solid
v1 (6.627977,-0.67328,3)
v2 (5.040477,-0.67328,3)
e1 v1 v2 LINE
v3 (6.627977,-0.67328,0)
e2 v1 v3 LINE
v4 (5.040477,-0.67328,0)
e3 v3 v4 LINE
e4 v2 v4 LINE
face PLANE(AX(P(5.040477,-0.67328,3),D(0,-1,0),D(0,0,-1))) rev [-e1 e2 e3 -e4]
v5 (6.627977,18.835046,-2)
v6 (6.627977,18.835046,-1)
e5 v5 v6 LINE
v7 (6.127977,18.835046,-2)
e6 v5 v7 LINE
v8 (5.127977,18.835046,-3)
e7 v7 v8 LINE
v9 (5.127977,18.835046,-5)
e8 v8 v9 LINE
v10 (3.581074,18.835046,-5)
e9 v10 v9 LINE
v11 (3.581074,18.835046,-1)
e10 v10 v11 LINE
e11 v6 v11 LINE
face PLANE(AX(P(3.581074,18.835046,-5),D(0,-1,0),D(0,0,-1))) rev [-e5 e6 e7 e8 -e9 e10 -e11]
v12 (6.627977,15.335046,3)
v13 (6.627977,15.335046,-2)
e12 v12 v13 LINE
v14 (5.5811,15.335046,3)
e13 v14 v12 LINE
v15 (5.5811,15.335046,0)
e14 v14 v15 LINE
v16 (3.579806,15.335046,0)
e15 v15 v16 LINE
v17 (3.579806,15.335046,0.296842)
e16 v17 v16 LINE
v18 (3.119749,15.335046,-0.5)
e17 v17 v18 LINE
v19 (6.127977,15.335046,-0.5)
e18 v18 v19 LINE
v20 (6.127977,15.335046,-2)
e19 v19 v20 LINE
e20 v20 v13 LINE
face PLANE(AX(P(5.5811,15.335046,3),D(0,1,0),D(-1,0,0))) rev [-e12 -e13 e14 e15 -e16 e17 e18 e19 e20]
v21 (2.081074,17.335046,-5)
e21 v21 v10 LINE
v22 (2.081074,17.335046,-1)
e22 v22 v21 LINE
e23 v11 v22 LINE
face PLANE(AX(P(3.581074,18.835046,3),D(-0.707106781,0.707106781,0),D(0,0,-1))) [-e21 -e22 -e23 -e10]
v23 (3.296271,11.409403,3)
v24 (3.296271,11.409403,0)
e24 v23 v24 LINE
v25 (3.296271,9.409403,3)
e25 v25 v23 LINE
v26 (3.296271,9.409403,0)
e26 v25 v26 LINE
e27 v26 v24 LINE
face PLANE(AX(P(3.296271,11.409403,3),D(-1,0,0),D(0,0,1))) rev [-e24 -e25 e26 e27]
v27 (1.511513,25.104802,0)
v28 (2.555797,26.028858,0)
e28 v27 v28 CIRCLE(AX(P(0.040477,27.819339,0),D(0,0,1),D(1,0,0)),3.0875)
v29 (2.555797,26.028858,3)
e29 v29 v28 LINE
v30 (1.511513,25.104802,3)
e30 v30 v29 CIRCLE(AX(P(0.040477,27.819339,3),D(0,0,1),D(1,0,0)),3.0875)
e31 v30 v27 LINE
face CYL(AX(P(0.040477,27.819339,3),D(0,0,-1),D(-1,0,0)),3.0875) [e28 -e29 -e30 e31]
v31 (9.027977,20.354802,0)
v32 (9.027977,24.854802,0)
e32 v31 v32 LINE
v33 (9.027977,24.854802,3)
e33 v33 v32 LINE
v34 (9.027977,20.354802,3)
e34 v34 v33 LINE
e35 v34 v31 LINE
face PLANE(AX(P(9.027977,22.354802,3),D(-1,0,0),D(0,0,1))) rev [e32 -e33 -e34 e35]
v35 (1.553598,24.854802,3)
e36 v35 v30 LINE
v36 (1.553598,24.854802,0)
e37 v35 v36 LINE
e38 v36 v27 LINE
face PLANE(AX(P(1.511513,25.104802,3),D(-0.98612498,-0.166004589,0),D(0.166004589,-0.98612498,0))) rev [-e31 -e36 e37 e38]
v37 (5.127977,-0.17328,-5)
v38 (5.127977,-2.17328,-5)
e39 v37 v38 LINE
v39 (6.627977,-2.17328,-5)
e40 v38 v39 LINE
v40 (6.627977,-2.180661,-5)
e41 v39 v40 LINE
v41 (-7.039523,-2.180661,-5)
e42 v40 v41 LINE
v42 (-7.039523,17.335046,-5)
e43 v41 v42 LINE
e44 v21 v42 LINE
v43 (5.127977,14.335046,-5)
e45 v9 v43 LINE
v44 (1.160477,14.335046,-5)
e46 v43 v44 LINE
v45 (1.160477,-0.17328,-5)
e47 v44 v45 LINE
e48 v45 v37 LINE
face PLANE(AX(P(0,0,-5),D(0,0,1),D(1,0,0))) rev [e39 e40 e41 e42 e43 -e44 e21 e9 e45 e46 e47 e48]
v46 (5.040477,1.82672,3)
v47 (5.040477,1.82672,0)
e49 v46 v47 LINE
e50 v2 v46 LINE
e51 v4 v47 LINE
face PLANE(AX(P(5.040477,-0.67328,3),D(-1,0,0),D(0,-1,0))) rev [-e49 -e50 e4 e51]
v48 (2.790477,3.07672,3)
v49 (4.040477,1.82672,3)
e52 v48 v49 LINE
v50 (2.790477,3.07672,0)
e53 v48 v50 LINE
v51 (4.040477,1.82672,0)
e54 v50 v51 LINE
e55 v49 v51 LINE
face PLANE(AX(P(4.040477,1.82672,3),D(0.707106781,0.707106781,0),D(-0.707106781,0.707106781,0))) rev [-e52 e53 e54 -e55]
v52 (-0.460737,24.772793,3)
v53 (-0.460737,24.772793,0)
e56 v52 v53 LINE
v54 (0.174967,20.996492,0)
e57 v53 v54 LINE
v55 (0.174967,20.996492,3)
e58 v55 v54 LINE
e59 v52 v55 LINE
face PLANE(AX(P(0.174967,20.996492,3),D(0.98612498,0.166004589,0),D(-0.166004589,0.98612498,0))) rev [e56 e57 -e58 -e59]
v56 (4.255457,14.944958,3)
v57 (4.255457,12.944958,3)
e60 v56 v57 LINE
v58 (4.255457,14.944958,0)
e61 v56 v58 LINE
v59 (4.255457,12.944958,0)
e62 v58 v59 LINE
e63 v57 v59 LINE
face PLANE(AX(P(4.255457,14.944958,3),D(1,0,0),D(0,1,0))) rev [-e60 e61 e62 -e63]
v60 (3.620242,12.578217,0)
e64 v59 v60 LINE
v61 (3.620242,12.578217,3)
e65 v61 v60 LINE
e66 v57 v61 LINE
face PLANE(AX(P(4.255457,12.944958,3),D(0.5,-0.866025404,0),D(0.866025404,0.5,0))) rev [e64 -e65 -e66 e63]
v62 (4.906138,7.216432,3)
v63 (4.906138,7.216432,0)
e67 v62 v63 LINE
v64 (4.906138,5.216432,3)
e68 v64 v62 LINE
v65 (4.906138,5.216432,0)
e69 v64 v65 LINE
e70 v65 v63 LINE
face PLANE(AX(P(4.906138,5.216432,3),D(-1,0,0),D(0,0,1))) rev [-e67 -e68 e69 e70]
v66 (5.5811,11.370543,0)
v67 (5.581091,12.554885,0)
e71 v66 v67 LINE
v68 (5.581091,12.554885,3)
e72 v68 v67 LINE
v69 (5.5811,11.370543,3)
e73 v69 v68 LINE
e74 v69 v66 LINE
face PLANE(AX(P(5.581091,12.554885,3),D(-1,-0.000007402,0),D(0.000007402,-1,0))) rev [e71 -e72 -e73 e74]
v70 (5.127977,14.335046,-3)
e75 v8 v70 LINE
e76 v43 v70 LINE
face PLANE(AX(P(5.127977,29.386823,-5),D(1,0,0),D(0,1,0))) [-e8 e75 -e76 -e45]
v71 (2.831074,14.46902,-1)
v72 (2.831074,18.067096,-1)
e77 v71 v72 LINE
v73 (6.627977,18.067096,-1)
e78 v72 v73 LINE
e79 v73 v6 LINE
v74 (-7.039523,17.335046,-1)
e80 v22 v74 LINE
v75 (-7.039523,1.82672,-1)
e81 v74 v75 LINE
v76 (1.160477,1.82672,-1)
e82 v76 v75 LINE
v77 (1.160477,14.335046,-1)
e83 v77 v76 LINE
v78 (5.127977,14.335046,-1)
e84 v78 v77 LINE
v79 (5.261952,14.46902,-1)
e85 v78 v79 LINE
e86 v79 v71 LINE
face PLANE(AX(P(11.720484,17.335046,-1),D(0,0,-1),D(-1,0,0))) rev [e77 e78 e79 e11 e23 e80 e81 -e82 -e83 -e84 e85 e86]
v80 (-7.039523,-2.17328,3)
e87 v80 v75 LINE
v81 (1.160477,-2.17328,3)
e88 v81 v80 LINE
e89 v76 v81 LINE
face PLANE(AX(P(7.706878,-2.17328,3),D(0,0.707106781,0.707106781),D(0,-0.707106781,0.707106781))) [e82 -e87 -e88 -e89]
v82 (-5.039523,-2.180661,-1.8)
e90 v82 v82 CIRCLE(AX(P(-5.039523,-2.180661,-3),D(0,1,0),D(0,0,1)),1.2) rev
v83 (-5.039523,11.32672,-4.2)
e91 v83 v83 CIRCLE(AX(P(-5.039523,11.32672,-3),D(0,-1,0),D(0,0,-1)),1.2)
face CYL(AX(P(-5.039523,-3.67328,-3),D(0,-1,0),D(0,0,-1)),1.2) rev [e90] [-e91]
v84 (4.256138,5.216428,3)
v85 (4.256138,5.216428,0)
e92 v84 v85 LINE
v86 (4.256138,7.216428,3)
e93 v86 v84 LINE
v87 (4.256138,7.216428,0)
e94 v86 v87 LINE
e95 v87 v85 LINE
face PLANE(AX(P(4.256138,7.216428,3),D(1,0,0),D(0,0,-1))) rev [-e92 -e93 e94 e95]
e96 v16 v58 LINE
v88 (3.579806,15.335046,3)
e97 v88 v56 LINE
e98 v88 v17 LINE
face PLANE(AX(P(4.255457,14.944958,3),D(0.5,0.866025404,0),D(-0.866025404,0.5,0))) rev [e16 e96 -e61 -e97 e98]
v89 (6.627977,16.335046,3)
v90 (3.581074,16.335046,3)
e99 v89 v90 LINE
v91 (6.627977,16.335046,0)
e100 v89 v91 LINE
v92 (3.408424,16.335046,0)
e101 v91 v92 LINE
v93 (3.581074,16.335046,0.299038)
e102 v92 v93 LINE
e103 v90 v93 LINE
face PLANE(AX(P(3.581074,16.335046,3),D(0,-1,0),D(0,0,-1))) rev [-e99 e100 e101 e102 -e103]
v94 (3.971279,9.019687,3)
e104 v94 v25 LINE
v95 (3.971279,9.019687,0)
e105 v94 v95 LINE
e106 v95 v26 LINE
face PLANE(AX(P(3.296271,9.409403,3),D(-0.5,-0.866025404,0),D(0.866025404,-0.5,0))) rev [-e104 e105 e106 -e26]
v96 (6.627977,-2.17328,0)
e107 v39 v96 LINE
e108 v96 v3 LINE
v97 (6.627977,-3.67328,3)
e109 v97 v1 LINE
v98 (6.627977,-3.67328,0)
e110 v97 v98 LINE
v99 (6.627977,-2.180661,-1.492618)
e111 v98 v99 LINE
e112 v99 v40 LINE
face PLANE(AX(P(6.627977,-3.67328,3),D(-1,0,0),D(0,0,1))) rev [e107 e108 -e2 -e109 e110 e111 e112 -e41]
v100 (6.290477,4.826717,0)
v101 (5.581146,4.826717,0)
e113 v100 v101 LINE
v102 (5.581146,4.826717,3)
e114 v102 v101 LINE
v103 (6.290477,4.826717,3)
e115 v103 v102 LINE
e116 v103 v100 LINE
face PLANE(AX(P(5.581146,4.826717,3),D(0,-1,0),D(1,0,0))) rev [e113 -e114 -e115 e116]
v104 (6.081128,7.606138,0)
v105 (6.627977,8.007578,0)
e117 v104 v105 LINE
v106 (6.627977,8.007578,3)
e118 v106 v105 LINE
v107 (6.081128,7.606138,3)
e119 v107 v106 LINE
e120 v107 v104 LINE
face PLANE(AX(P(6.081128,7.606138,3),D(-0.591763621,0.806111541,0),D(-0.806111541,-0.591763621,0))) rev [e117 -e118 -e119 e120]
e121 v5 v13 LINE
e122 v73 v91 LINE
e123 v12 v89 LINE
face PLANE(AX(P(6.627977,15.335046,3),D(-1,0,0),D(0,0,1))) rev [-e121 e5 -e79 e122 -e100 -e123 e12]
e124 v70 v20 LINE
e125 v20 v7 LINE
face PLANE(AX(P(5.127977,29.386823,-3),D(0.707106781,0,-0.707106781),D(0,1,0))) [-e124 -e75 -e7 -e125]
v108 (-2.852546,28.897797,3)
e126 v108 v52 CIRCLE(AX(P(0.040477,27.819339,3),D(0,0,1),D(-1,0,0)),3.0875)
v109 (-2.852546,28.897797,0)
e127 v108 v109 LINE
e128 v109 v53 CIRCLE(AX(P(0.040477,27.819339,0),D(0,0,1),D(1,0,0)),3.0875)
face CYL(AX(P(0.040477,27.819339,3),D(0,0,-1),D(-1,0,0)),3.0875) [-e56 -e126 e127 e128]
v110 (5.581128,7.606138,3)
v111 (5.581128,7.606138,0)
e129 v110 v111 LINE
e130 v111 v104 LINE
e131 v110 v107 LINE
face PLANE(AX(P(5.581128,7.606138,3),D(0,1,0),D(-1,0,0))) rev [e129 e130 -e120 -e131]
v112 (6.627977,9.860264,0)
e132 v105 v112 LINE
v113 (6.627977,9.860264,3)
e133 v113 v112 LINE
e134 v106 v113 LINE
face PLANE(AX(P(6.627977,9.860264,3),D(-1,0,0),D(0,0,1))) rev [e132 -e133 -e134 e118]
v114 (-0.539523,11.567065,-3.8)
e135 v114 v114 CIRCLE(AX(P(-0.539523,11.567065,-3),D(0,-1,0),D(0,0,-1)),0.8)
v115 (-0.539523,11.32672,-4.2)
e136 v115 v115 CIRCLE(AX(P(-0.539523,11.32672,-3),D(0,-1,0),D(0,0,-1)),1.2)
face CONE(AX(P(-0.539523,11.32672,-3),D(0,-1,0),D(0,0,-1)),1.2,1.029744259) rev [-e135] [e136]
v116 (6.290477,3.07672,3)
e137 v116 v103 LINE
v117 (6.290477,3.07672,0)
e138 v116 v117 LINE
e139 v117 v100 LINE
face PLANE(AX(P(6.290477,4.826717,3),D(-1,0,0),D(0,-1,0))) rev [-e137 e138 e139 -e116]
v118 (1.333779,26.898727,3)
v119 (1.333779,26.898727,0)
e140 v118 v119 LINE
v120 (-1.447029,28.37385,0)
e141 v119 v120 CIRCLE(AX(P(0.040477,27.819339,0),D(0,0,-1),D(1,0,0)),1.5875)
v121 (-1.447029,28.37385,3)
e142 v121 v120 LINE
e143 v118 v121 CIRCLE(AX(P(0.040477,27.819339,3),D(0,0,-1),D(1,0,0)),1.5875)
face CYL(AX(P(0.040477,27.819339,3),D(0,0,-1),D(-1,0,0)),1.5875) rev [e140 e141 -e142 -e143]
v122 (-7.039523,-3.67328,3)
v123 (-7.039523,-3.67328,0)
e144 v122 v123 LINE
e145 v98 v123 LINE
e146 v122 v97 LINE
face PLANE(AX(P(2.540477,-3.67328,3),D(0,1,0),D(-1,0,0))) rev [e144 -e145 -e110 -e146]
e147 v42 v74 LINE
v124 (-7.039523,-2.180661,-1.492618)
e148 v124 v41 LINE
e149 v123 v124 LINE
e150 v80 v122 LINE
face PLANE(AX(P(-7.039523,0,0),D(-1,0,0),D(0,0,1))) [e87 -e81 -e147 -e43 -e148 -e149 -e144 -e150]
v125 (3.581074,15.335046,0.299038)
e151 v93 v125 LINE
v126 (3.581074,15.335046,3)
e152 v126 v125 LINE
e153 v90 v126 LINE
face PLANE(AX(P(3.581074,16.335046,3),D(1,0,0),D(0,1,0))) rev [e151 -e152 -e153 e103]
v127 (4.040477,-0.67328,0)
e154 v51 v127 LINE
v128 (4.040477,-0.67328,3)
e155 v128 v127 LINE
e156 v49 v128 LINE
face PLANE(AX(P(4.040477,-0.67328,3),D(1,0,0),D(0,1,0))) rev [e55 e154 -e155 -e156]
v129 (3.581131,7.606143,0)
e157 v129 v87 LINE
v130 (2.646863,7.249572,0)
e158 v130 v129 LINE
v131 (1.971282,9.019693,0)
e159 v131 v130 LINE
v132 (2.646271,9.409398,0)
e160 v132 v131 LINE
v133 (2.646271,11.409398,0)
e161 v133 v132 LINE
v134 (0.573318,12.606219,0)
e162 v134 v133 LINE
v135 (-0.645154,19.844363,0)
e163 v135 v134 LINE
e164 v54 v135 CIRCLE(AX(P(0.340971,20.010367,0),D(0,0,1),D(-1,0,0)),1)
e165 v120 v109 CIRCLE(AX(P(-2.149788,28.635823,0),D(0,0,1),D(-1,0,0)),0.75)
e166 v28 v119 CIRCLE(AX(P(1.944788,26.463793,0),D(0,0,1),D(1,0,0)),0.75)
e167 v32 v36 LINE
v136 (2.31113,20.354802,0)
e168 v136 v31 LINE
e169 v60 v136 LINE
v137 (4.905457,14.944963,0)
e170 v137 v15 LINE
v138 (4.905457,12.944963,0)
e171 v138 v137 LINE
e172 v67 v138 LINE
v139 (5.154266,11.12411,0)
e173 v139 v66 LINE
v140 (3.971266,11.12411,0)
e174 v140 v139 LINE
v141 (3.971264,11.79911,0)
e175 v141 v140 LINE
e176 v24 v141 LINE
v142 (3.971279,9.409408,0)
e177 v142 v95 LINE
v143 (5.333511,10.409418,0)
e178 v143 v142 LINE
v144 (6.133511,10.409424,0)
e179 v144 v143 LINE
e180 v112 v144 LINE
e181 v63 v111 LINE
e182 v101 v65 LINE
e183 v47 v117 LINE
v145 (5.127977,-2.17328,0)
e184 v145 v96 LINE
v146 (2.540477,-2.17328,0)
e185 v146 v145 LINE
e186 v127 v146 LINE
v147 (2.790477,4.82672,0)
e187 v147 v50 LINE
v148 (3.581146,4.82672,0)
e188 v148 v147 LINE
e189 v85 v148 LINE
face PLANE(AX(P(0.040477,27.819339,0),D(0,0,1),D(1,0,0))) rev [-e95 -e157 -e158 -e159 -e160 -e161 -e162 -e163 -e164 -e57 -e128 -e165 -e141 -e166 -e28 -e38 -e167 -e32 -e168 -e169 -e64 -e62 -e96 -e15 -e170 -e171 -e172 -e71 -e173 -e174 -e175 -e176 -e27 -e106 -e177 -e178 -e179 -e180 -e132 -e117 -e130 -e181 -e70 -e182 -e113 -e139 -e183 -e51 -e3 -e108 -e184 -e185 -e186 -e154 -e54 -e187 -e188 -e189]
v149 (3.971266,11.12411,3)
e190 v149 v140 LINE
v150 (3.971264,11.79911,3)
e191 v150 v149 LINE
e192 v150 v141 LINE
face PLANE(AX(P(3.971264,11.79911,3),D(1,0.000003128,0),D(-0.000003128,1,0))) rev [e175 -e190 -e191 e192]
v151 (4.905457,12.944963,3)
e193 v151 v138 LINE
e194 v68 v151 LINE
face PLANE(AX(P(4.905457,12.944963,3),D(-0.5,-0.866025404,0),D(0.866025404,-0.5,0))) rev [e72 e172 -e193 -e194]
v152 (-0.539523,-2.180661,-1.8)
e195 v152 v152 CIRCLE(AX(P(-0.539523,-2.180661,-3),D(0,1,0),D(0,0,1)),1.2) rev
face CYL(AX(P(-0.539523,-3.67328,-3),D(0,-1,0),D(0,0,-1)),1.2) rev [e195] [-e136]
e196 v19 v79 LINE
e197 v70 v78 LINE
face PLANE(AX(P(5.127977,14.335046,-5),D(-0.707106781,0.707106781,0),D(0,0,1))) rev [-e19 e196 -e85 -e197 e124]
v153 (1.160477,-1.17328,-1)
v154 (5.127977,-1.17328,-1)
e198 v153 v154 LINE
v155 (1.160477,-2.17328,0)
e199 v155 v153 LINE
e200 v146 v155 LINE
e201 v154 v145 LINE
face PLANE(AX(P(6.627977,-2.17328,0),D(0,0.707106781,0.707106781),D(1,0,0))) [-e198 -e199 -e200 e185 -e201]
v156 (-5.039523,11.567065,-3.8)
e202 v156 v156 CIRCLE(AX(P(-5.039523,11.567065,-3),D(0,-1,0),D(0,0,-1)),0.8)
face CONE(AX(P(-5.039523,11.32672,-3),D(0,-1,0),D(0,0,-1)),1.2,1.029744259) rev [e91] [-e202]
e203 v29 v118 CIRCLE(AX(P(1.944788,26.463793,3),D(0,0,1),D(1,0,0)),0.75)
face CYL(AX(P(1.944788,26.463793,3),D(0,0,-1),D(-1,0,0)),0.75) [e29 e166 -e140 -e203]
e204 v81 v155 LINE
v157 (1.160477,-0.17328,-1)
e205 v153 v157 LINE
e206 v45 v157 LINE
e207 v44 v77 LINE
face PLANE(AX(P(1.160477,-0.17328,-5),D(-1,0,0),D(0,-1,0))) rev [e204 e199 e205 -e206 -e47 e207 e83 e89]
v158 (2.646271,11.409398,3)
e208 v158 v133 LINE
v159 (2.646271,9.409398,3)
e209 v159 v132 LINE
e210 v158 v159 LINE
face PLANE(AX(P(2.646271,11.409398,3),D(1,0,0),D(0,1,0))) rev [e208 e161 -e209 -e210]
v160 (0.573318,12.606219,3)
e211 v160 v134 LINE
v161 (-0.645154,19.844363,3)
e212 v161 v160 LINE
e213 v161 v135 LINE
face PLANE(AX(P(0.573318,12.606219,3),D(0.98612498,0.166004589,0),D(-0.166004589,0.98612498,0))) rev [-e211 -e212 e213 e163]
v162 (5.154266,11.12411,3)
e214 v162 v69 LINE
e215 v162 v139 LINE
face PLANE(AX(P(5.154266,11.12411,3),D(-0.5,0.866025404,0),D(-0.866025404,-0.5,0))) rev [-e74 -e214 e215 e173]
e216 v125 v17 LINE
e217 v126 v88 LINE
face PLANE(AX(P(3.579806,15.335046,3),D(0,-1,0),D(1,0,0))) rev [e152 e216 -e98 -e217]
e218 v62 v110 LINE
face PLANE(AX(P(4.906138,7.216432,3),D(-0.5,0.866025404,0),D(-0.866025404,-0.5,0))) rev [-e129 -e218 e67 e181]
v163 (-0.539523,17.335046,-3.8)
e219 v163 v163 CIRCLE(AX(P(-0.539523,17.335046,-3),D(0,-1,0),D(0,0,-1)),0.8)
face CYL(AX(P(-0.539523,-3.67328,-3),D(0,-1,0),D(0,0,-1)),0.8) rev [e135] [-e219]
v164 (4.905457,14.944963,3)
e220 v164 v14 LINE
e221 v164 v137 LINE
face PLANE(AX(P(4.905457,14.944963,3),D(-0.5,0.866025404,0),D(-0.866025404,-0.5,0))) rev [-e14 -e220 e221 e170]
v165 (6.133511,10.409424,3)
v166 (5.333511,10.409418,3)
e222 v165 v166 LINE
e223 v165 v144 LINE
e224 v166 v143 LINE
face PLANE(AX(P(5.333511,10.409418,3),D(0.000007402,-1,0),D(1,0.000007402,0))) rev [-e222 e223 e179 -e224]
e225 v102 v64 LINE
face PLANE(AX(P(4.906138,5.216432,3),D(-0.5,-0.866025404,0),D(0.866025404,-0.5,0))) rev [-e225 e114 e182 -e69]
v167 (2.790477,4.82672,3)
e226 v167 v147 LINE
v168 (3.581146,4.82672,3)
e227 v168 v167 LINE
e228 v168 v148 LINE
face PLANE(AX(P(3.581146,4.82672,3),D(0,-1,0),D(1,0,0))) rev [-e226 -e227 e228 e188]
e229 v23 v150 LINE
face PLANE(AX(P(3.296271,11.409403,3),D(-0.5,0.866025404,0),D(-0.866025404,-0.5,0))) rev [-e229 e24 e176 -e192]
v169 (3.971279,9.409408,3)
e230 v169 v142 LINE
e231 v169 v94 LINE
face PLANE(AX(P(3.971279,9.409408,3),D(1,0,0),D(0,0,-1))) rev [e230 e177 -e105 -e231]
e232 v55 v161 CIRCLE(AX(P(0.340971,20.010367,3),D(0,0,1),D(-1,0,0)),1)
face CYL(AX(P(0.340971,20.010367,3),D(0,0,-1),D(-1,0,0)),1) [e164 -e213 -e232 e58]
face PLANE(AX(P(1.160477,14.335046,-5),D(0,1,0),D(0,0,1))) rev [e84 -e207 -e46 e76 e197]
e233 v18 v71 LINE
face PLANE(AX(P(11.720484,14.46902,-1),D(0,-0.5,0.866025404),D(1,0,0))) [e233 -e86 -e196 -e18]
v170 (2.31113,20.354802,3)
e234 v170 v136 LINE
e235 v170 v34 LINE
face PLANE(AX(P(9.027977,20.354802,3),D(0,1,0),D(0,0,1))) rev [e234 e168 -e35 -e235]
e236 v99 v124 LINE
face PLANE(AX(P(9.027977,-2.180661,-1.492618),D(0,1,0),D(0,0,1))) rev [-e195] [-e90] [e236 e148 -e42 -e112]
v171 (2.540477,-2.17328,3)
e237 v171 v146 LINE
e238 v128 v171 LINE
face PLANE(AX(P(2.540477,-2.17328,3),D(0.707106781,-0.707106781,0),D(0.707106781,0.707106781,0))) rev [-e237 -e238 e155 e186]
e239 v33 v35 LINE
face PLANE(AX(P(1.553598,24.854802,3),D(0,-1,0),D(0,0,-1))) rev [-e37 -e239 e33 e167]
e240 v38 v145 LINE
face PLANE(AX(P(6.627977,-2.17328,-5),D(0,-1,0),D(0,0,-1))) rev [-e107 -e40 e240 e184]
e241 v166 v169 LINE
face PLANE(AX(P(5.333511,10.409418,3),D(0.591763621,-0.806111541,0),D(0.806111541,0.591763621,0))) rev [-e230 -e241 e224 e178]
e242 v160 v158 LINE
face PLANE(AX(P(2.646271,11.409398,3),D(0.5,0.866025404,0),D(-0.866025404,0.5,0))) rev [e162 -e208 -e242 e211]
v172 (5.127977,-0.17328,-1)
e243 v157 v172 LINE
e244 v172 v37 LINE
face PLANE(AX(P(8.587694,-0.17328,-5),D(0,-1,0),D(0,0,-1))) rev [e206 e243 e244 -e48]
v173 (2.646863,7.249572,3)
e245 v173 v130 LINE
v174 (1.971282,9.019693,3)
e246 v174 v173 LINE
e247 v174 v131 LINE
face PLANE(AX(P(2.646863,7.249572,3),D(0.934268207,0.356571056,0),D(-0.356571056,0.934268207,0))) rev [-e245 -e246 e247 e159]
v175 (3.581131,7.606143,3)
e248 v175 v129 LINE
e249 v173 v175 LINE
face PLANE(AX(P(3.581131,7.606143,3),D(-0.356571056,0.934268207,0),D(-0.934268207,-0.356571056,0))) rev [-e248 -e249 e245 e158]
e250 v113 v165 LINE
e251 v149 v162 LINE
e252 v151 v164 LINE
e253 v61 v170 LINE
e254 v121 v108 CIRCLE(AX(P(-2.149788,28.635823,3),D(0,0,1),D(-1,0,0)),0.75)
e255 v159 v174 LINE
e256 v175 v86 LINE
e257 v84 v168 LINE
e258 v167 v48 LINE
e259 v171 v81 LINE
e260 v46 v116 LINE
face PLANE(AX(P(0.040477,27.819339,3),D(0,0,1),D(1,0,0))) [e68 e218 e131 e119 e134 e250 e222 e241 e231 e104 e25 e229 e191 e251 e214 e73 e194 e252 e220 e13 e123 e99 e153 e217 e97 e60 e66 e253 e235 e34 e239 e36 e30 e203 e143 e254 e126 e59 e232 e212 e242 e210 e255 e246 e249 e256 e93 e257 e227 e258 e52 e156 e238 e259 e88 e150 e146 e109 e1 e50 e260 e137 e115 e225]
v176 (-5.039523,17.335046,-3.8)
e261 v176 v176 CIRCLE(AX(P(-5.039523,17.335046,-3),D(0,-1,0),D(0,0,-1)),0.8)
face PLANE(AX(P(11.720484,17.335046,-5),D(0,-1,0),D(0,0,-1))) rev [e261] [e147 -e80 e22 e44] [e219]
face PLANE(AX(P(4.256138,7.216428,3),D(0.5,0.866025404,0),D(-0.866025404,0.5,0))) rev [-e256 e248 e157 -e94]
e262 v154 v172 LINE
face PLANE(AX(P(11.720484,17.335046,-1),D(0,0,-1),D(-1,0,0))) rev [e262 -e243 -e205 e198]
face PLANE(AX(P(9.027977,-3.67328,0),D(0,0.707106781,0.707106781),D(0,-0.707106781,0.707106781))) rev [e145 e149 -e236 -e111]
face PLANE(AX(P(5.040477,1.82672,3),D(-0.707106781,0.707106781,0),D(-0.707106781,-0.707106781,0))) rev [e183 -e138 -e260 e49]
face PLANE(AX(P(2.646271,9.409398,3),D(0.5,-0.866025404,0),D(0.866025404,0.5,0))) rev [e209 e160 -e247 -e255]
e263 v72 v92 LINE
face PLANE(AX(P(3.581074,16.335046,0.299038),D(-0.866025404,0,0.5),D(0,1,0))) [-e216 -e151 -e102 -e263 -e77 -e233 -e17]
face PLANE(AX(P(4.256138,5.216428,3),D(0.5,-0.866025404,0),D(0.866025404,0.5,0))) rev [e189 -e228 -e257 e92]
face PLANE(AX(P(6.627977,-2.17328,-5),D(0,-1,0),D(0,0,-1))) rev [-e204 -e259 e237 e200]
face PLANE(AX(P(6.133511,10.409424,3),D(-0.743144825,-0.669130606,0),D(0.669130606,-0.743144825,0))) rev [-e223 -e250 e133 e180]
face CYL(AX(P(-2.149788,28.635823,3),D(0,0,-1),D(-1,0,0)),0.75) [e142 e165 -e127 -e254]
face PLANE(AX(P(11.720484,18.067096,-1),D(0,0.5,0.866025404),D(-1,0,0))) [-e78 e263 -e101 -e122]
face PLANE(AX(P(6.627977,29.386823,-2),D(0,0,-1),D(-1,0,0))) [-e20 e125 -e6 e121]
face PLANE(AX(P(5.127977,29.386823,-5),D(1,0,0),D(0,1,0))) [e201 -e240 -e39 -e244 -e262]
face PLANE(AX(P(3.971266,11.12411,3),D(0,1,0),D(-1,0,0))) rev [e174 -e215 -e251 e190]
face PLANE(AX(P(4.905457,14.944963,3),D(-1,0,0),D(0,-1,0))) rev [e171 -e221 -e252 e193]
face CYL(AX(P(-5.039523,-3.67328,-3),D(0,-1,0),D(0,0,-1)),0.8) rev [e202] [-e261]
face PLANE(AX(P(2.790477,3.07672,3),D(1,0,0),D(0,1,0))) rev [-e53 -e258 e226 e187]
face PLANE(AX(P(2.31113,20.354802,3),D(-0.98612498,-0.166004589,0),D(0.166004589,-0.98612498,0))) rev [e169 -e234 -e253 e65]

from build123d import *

# Parameters (mm, degrees)
BOSS_SWITCH_BODY_DEPTH                    = 3
SKETCH1_W                                 = 4.0875
SKETCH1_H                                 = 1.5
SKETCH1_W_2                               = 3.046903414
SKETCH1_H_2                               = 3.5
BOSS_FLANGE_WIDTH_DEPTH                   = 5
SKETCH2_W                                 = 4
SKETCH2_H                                 = 2
SKETCH2_W_2                               = 8
SKETCH2_H_2                               = 1.5
BOSS_FLANGE_HEIGHT_DEPTH                  = 10.620596586
CUT_UP_TO_DOWN_DERAILLEUR_CLEARANCE_REACH = 23.629
SKETCH10_W                                = 1.5
SKETCH10_H                                = 3
SKETCH17_W                                = 12.1675
SKETCH17_H                                = 4
BOSS_FLANGE_SUPPORT_DEPTH                 = 17.508325141
TAP_DRILL_FOR_M2X0_4_TAP1_D               = 1.6
M2_CLEARANCE_HOLE2_D                      = 2.4
M2_CLEARANCE_HOLE2_DEPTH                  = 15
M2_CLEARANCE_HOLE2_TIP                    = 0.721032743
CHAMFER_FLANGE_SUPPORT_SIZE               = 1.5
CHAMFER_FLANGE_SUPPORT_2_SIZE             = 1
SKETCH28_W                                = 3.046903414
SKETCH28_H                                = 2.5
CUT_EXTRUDE1_DEPTH                        = 1
CHAMFER10_SIZE                            = 1
CHAMFER10_SIZE2                           = 1.732050808
CHAMFER_FLANGE_SUPPORT_3_SIZE             = 1
CUT_EXTRUDE2_DEPTH                        = 34.862828732
CHAMFER12_SIZE                            = 0.5
CHAMFER12_SIZE2                           = 0.866025404
SKETCH23_W                                = 7.42721664
SKETCH23_H                                = 14.508325141
CUT_GAP_FOR_PRINTING_DEPTH                = 32.000499688
BOSS_EXTRUDE2_DEPTH                       = 8.2
CHAMFER11_SIZE                            = 0.75
CHAMFER11_SIZE_2                          = 1.299038106


# Some blends are built 0.0001 mm under size
with BuildPart() as part:
    # Sketch-SwitchBossUp → Boss-Switch Body (new body)
    with BuildSketch(Plane.XY):
        with BuildLine():
            Line((5.581091204, 12.554885442), (5.58109997, 11.370542897))
            Line((5.58109997, 11.370542897), (5.154266051, 11.12411022))
            Line((5.154266051, 11.12411022), (3.971266051, 11.12411022))
            Line((3.971266051, 11.12411022), (3.97126394, 11.79911022))
            Line((3.97126394, 11.79911022), (3.296271341, 11.409403061))
            Line((3.296271341, 11.409403061), (3.296271341, 9.409403061))
            Line((3.296271341, 9.409403061), (3.971278743, 9.019687356))
            Line((3.971278743, 9.019687356), (3.971278743, 9.409408058))
            Line((3.971278743, 9.409408058), (5.333511297, 10.40941814))
            Line((5.333511297, 10.40941814), (6.133511297, 10.409424062))
            Line((6.133511297, 10.409424062), (6.627976927, 9.860264345))
            Line((6.627976927, 9.860264345), (6.627976927, 8.007577878))
            Line((6.627976927, 8.007577878), (6.081127833, 7.606137899))
            Line((6.081127833, 7.606137899), (5.581127833, 7.606137899))
            Line((5.581127833, 7.606137899), (4.906138119, 7.216432406))
            Line((4.906138119, 7.216432406), (4.906138119, 5.216432406))
            Line((4.906138119, 5.216432406), (5.58114552, 4.826716701))
            Line((5.58114552, 4.826716701), (6.290476927, 4.826716701))
            Line((6.290476927, 4.826716701), (6.290476927, 3.076720436))
            Line((6.290476927, 3.076720436), (5.040476927, 1.826720436))
            Line((5.040476927, 1.826720436), (5.040476927, -0.673279564))
            Line((5.040476927, -0.673279564), (6.627976927, -0.673279564))
            Line((6.627976927, -0.673279564), (6.627976927, -3.673279564))
            Line((6.627976927, -3.673279564), (2.540476927, -3.673279564))
            Line((2.540476927, -3.673279564), (2.540476927, -2.173279564))
            Line((2.540476927, -2.173279564), (4.040476927, -0.673279564))
            Line((4.040476927, -0.673279564), (4.040476927, 1.826720436))
            Line((4.040476927, 1.826720436), (2.790476927, 3.076720436))
            Line((2.790476927, 3.076720436), (2.790476927, 4.826720436))
            Line((2.790476927, 4.826720436), (3.58114552, 4.826720436))
            Line((3.58114552, 4.826720436), (4.256138119, 5.216427595))
            Line((4.256138119, 5.216427595), (4.256138119, 7.216427595))
            Line((4.256138119, 7.216427595), (3.581130717, 7.6061433))
            Line((3.581130717, 7.6061433), (2.64686251, 7.249572244))
            Line((2.64686251, 7.249572244), (1.971281627, 9.019692757))
            Line((1.971281627, 9.019692757), (2.646271341, 9.40939825))
            Line((2.646271341, 9.40939825), (2.646271341, 11.40939825))
            Line((2.646271341, 11.40939825), (1.696557212, 11.957715958))
            Line((1.696557212, 11.957715958), (0.573317845, 12.60621851))
            Line((0.573317845, 12.60621851), (-0.645153605, 19.844362607))
            ThreePointArc((-0.645153605, 19.844362607), (-0.473707256, 20.590279886), (0.174966786, 20.996492176))
            Line((0.174966786, 20.996492176), (-0.46073685, 24.772792819))
            ThreePointArc((-0.46073685, 24.772792819), (-1.019582136, 24.919522879), (-1.541303694, 25.167805745))
            ThreePointArc((-1.541303694, 25.167805745), (-2.872284003, 26.795385437), (-2.852546321, 28.897797067))
            ThreePointArc((-2.852546321, 28.897797067), (-1.887813913, 29.338582026), (-1.447028953, 28.373849618))
            ThreePointArc((-1.447028953, 28.373849618), (-0.703448682, 26.416936722), (1.333779254, 26.898727173))
            ThreePointArc((1.333779254, 26.898727173), (2.379722745, 27.074801628), (2.555797201, 26.028858137))
            ThreePointArc((2.555797201, 26.028858137), (2.086504637, 25.507104397), (1.511513111, 25.104801997))
            Line((1.511513111, 25.104801997), (1.553598189, 24.854801997))
            Line((1.553598189, 24.854801997), (9.027976927, 24.854801997))
            Line((9.027976927, 24.854801997), (9.027976927, 22.354801997))
            Line((9.027976927, 22.354801997), (9.027976927, 20.354801997))
            Line((9.027976927, 20.354801997), (2.311129602, 20.354801997))
            Line((2.311129602, 20.354801997), (3.620242387, 12.578216848))
            Line((3.620242387, 12.578216848), (4.255457038, 12.944958198))
            Line((4.255457038, 12.944958198), (4.255457038, 14.944958198))
            Line((4.255457038, 14.944958198), (3.579805878, 15.335045577))
            Line((3.579805878, 15.335045577), (3.581073513, 15.335045577))
            Line((3.581073513, 15.335045577), (3.581073513, 16.335045577))
            Line((3.581073513, 16.335045577), (5.725580434, 16.335045577))
            Line((5.725580434, 16.335045577), (6.627976927, 16.335045577))
            Line((6.627976927, 16.335045577), (6.627976927, 15.335045577))
            Line((6.627976927, 15.335045577), (5.581099865, 15.335045577))
            Line((5.581099865, 15.335045577), (4.905457038, 14.944963009))
            Line((4.905457038, 14.944963009), (4.905457038, 12.944963009))
            Line((4.905457038, 12.944963009), (5.581091204, 12.554885442))
        make_face()
    extrude(amount=BOSS_SWITCH_BODY_DEPTH)

    # Sketch1 → Boss-Flange Width (add)
    with BuildSketch(Plane(origin=(0, 0, 0), x_dir=(-1, 0, 0), z_dir=(0, 0, -1))):
        with Locations((-4.584226927, -2.923279564)):
            Rectangle(SKETCH1_W, SKETCH1_H)
        with Locations((-5.10452522, 17.085045577)):
            Rectangle(SKETCH1_W_2, SKETCH1_H_2)
    extrude(amount=BOSS_FLANGE_WIDTH_DEPTH)

    # Sketch2 → Boss-Flange Height (add)
    with BuildSketch(Plane(origin=(-7.039523073, 0, 0), x_dir=(0, 0, -1), z_dir=(1, 0, 0))):
        with Locations((3, 16.335045577)):
            Rectangle(SKETCH2_W, SKETCH2_H)
        with Locations((1, -2.923279564)):
            Rectangle(SKETCH2_W_2, SKETCH2_H_2)
    extrude(amount=BOSS_FLANGE_HEIGHT_DEPTH)

    # Sketch10 → Cut-Up-To-Down Derailleur Clearance (cut, up to next)
    with BuildSketch(Plane(origin=(0, 15.335045577, 0), x_dir=(1, 0, 0), z_dir=(0, 1, 0)), mode=Mode.PRIVATE) as cut_up_to_down_derailleur_clearance_sk1:
        with Locations((5.877976927, 3.5)):
            Rectangle(SKETCH10_W, SKETCH10_H)
    cut_up_to_down_derailleur_clearance_tool1 = extrude(cut_up_to_down_derailleur_clearance_sk1.sketch, amount=CUT_UP_TO_DOWN_DERAILLEUR_CLEARANCE_REACH, mode=Mode.PRIVATE) & part.part
    add(cut_up_to_down_derailleur_clearance_tool1.solids().sort_by_distance((5.877977, 15.335046, -3.5))[0], mode=Mode.SUBTRACT)

    # Sketch17 → Boss-Flange Support (add)
    with BuildSketch(Plane.XZ.offset(-15.335045577)):
        with Locations((-0.955773073, -3)):
            Rectangle(SKETCH17_W, SKETCH17_H)
    extrude(amount=BOSS_FLANGE_SUPPORT_DEPTH)

    # Tap Drill for M2x0.4 Tap1 (through all)
    with Locations(Plane(origin=(0, -3.673279564, 0), x_dir=(-1, 0, 0), z_dir=(0, -1, 0))):
        with Locations((5.039523073, 3), (0.539523073, 3)):
            Hole(TAP_DRILL_FOR_M2X0_4_TAP1_D / 2)

    # M2 Clearance Hole2
    with Locations(Plane.XZ.offset(3.673279564)):
        with Locations((-5.039523073, -3), (-0.539523073, -3)):
            Hole(M2_CLEARANCE_HOLE2_D / 2, depth=M2_CLEARANCE_HOLE2_DEPTH)
            with Locations((0, 0, -(M2_CLEARANCE_HOLE2_DEPTH + M2_CLEARANCE_HOLE2_TIP / 2))):  # 118° drill point
                Cone(0, M2_CLEARANCE_HOLE2_D / 2, M2_CLEARANCE_HOLE2_TIP, mode=Mode.SUBTRACT)

    # Chamfer-Flange Support
    chamfer_flange_support_edges = [part.edges().sort_by_distance(p)[0] for p in [
        (3.581073513, 17.335045577, -3),
    ]]
    chamfer(chamfer_flange_support_edges, length=CHAMFER_FLANGE_SUPPORT_SIZE - 0.0001)  # a hair under: the kernel refuses the full size

    # Chamfer-Flange Support 2
    chamfer_flange_support_2_edges = [part.edges().sort_by_distance(p)[0] for p in [
        (5.127976927, 17.085045577, -2),
        (5.127976927, 15.335045577, -1.5),
    ]]
    chamfer(chamfer_flange_support_2_edges, length=CHAMFER_FLANGE_SUPPORT_2_SIZE)

    # Sketch28 → Cut-Extrude1 (cut)
    with BuildSketch(Plane.XY.offset(-1)):
        with Locations((5.10452522, 17.585045577)):
            Rectangle(SKETCH28_W, SKETCH28_H)
    extrude(amount=CUT_EXTRUDE1_DEPTH, mode=Mode.SUBTRACT)

    # Chamfer10
    chamfer10_edges = [part.edges().sort_by_distance(p)[0] for p in [
        (5.10452522, 16.335045577, -1),
    ]]
    chamfer10_side = [part.faces().sort_by_distance(p)[0] for p in [
        (5.10452522, 16.335045577, 1),
    ]]
    chamfer(chamfer10_edges, length=CHAMFER10_SIZE, length2=CHAMFER10_SIZE2, reference=chamfer10_side[0])

    # Chamfer-Flange Support 3
    chamfer_flange_support_3_edges = [part.edges().sort_by_distance(p)[0] for p in [
        (-0.955773073, -2.173279564, -1),
    ]]
    chamfer(chamfer_flange_support_3_edges, length=CHAMFER_FLANGE_SUPPORT_3_SIZE - 0.0001)  # a hair under: the kernel refuses the full size

    # Sketch31 → Cut-Extrude2 (cut, through all)
    with BuildSketch(Plane.ZY.offset(7.039523073)):
        Polygon((-5, -2.180661432), (-5, -3.673279564), (0, -3.673279564), (-1.492618132, -2.180661432), align=None)
    extrude(amount=-CUT_EXTRUDE2_DEPTH, mode=Mode.SUBTRACT)

    # Chamfer12
    chamfer12_edges = [part.edges().sort_by_distance(p)[0] for p in [
        (4.85452522, 15.335045577, -1),
    ]]
    chamfer12_side = [part.faces().sort_by_distance(p)[0] for p in [
        (5.669366922, 15.335045577, 0.364483359),
    ]]
    chamfer(chamfer12_edges, length=CHAMFER12_SIZE, length2=CHAMFER12_SIZE2, reference=chamfer12_side[0])

    # Sketch23 → Cut-Gap for Printing (cut, through all)
    with BuildSketch(Plane.XY.offset(-1)):
        with Locations((4.874085247, 7.080883007)):
            Rectangle(SKETCH23_W, SKETCH23_H)
    extrude(amount=-CUT_GAP_FOR_PRINTING_DEPTH, mode=Mode.SUBTRACT)

    # Sketch32 → Boss-Extrude2 (add)
    with BuildSketch(Plane.ZY.offset(7.039523073)):
        Polygon((3, -2.173279564), (-1, 1.826720436), (-1, -2.082793031), (0.406297605, -3.355496176), (3, -3.355496176), align=None)
    extrude(amount=-BOSS_EXTRUDE2_DEPTH)

    # Chamfer11
    # the kernel refuses this chamfer: 1.299038106, 0.75 mm, written as the material it adds along each edge
    with BuildSketch(Plane(origin=(3.581073513, 11.108297196, -1), x_dir=(-0.9983227437537926, 0, -0.05789386240267147), z_dir=(0, 1, 0))) as chamfer11_piece_1_section:
        Polygon((CHAMFER11_SIZE * 0.998322743754, CHAMFER11_SIZE * 0.0578938624027), (-CHAMFER11_SIZE_2 * 0.0578938623883, CHAMFER11_SIZE_2 * 0.998322743505), (0, 0), align=None)
    chamfer11_piece_1 = extrude(amount=5.226748382, mode=Mode.PRIVATE)
    chamfer11_piece_1 = split(chamfer11_piece_1, bisect_by=Plane(origin=(3.144000621, 15.335045577, -0.473759617), z_dir=(1.4013159114223785e-12, 1.0, 0)), keep=Keep.TOP, mode=Mode.PRIVATE)
    add(chamfer11_piece_1)
    with BuildSketch(Plane(origin=(3.581073513, 11.108297196, -1), x_dir=(-0.9983227437537926, 0, -0.05789386240267147), z_dir=(0, 1, 0))) as chamfer11_piece_2_section:
        Polygon((CHAMFER11_SIZE * 0.998322743754, CHAMFER11_SIZE * 0.0578938624027), (-CHAMFER11_SIZE_2 * 0.0578938623883, CHAMFER11_SIZE_2 * 0.998322743505), (0, 0), align=None)
    chamfer11_piece_2 = extrude(amount=5.226748382, mode=Mode.PRIVATE)
    chamfer11_piece_2 = split(chamfer11_piece_2, bisect_by=Plane(origin=(3.059810406, 14.920794757, -0.739167823), z_dir=(0, 0.4999999999999982, -0.8660254037844397)), keep=Keep.TOP, mode=Mode.PRIVATE)
    add(chamfer11_piece_2)
    with BuildSketch(Plane(origin=(3.581073513, 16.335045577, -1), x_dir=(-0.9983227437537926, 0, -0.05789386240267147), z_dir=(0, 1, 0))) as chamfer11_piece_3_section:
        Polygon((CHAMFER11_SIZE * 0.998322743754, CHAMFER11_SIZE * 0.0578938624027), (-CHAMFER11_SIZE_2 * 0.0578938623883, CHAMFER11_SIZE_2 * 0.998322743505), (0, 0), align=None)
    chamfer11_piece_3 = extrude(amount=5.092773786, mode=Mode.PRIVATE)
    chamfer11_piece_3 = split(chamfer11_piece_3, bisect_by=Plane(origin=(3.285691508, 17.119009851, -0.452621985), z_dir=(0, -0.4999999999999982, -0.8660254037844397)), keep=Keep.TOP, mode=Mode.PRIVATE)
    add(chamfer11_piece_3)


solid = part.part
